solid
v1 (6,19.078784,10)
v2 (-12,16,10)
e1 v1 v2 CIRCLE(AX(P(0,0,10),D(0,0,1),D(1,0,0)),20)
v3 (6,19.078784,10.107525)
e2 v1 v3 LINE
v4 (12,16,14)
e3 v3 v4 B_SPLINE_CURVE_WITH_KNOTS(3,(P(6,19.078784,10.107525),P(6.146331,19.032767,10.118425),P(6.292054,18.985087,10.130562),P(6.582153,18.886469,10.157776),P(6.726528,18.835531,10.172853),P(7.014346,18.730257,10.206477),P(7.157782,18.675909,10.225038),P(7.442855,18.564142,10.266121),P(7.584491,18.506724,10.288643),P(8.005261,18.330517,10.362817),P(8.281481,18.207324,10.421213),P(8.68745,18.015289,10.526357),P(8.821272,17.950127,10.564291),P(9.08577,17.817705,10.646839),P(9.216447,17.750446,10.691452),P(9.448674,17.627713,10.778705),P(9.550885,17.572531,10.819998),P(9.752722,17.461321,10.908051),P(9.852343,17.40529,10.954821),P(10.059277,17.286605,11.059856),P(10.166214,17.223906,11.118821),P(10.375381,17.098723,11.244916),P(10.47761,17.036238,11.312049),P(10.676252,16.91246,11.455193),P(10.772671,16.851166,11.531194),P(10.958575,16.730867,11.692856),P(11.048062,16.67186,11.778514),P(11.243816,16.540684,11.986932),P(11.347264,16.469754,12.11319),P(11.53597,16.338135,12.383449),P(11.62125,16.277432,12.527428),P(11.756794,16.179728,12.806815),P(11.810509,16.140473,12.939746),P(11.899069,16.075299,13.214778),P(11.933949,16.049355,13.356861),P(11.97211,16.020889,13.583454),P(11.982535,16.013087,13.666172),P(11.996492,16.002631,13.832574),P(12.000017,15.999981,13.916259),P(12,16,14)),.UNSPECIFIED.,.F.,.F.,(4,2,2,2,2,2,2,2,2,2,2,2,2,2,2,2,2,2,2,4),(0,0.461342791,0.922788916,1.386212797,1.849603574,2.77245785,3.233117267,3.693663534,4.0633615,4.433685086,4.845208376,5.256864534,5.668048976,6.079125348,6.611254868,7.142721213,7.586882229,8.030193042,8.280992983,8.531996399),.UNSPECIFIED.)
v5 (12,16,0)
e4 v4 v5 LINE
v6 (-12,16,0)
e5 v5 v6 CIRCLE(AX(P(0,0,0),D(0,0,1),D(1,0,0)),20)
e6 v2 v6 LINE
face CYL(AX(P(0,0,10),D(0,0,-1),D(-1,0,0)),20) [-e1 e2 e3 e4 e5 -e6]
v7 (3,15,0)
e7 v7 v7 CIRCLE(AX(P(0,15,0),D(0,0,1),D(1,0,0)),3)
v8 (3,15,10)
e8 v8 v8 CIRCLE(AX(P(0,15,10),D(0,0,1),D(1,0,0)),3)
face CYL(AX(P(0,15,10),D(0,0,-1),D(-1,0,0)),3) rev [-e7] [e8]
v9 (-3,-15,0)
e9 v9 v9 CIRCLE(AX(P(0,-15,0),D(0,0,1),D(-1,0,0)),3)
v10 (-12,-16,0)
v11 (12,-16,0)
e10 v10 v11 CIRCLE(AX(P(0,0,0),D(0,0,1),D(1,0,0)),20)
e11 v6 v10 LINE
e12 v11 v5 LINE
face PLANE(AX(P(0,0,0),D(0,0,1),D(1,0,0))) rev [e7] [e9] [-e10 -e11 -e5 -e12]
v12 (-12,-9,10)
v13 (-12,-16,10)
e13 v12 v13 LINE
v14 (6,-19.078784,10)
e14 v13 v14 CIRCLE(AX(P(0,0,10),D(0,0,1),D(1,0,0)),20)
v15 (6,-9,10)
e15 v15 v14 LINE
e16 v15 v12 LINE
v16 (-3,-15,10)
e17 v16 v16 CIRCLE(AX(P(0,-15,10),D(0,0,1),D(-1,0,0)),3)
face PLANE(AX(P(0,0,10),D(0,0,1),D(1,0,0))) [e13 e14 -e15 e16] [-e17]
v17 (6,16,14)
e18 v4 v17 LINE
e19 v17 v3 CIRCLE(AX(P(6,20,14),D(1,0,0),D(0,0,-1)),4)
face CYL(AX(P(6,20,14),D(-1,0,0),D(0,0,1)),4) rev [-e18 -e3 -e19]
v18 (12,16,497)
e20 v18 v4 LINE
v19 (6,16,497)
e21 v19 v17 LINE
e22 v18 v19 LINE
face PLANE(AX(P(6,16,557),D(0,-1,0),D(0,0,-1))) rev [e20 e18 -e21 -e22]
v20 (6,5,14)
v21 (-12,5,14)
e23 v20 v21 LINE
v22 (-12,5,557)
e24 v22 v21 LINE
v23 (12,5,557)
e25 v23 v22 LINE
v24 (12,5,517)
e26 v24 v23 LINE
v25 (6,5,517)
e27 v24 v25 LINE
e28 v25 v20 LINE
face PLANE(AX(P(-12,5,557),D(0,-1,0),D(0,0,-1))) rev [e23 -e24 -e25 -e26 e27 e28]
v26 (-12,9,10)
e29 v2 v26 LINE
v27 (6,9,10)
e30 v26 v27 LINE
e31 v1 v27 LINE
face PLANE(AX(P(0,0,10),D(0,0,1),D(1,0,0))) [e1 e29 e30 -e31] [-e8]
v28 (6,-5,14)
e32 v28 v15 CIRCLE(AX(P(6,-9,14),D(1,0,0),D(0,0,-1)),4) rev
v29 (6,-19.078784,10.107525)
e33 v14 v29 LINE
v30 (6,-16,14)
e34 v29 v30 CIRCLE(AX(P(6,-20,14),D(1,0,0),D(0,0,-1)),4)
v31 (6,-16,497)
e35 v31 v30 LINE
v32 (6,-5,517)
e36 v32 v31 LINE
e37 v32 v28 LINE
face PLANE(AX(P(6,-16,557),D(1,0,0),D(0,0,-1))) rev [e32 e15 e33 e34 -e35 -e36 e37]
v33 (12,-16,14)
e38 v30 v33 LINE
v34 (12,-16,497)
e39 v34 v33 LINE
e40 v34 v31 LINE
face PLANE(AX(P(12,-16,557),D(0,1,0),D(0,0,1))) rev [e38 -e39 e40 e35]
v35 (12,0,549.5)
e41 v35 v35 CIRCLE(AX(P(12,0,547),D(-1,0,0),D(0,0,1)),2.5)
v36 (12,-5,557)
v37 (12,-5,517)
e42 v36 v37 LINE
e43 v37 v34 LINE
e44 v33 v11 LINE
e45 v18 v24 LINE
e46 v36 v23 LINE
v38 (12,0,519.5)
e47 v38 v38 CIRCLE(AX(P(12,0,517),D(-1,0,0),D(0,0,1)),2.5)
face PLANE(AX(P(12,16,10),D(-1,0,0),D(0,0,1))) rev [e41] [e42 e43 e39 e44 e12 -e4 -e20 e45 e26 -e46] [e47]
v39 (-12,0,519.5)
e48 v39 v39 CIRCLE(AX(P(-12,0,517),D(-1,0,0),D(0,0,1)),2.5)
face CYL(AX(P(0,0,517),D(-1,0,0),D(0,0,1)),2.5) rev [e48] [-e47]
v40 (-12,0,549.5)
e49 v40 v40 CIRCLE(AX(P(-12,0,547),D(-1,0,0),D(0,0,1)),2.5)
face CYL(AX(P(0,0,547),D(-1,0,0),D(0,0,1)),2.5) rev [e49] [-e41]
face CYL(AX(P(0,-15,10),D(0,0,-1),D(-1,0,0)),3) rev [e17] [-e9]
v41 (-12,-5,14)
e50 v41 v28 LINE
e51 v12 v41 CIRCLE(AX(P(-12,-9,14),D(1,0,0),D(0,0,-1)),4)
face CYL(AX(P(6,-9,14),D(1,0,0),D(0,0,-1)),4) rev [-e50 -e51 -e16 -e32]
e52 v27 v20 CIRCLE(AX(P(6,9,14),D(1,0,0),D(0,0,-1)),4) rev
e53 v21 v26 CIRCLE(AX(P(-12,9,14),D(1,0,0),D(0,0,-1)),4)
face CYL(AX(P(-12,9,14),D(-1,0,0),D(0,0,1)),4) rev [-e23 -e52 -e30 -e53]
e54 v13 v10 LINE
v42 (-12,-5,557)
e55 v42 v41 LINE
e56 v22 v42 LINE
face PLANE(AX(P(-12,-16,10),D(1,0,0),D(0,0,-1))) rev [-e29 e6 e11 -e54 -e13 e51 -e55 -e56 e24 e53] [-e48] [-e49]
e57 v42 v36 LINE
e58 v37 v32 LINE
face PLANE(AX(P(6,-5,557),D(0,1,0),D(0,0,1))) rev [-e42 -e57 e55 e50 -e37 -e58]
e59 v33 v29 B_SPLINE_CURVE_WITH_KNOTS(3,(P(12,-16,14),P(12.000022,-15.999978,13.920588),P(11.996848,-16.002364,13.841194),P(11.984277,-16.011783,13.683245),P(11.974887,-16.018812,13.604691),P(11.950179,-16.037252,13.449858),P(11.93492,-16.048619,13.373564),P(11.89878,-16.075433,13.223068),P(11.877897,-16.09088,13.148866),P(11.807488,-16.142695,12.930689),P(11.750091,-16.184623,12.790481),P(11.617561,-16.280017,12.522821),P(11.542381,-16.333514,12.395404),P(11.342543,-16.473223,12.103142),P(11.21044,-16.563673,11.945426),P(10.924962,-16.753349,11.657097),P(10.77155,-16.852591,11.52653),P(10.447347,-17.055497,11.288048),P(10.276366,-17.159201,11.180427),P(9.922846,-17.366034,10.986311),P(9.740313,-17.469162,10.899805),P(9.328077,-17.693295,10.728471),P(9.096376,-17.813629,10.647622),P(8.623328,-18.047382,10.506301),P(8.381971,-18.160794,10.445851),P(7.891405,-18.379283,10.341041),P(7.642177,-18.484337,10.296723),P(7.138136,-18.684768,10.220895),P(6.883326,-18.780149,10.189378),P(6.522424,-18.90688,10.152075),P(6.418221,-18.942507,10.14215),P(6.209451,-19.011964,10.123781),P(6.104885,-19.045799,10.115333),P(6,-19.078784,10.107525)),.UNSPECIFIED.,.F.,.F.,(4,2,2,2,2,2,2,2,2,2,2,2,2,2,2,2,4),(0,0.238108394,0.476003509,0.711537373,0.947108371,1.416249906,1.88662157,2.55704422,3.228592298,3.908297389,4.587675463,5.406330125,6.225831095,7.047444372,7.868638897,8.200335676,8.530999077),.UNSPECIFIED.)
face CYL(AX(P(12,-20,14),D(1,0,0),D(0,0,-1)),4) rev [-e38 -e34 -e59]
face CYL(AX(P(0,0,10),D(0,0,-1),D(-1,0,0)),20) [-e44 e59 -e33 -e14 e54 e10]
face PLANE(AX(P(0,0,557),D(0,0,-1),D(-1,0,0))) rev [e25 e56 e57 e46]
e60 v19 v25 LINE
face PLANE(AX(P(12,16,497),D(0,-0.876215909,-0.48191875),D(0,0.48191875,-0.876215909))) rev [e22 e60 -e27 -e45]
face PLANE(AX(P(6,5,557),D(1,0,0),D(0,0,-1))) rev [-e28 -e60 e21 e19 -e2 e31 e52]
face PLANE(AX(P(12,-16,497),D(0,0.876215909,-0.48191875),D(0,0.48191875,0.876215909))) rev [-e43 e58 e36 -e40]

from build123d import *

# Parameters (mm, degrees)
ESQUISSE1_R             = 3
BOSS_EXTRU_1_DEPTH      = 10
BOSS_EXTRU_2_DEPTH      = 547
ENL_V_MAT_EXTRU_1_DEPTH = 558.649531516
CONG_1_R                = 4
ESQUISSE4_R             = 2.5
ENL_V_MAT_EXTRU_2_DEPTH = 12
ENL_V_START             = -12
ESQUISSE4_2_R           = 2.5
ENL_V_MAT_EXTRU_3_DEPTH = 12


with BuildPart() as part:
    # Esquisse1 → Boss.-Extru.1 (new body)
    with BuildSketch(Plane.XY):
        with BuildLine():
            Line((12, 16), (12, -16))
            ThreePointArc((12, -16), (0, -20), (-12, -16))
            Line((-12, -16), (-12, 16))
            ThreePointArc((-12, 16), (0, 20), (12, 16))
        make_face()
        with Locations((0, 15)):
            Circle(ESQUISSE1_R, mode=Mode.SUBTRACT)
        with Locations(Location((0, -15, 0), (0, 0, 180))):
            Circle(ESQUISSE1_R, mode=Mode.SUBTRACT)
    extrude(amount=BOSS_EXTRU_1_DEPTH)

    # Esquisse2 → Boss.-Extru.2 (add)
    with BuildSketch(Plane.XY.offset(10)):
        Polygon((12, 16), (12, -16), (6, -16), (6, -5), (-12, -5), (-12, 5), (6, 5), (6, 16), align=None)
    extrude(amount=BOSS_EXTRU_2_DEPTH)

    # Esquisse3 → Enlèv. mat.-Extru.1 (cut, through all)
    with BuildSketch(Plane.ZY.offset(-6)):
        Polygon((557, 5), (557, 16), (497, 16), (517, 5), align=None)
        Polygon((557, -5), (557, -16), (497, -16), (517, -5), align=None)
    extrude(amount=-ENL_V_MAT_EXTRU_1_DEPTH, mode=Mode.SUBTRACT)

    # Congé1
    # the kernel refuses this fillet: 4 mm, written as the material it adds along each edge
    with BuildSketch(Plane(origin=(6, 16, 10), x_dir=(0, 0, 1), z_dir=(1, 0, 0))) as cong_1_piece_1_section:
        with BuildLine():
            CenterArc((CONG_1_R, -CONG_1_R), CONG_1_R, 90, 90)
            Line((0, -CONG_1_R), (0, 0))
            Line((0, 0), (CONG_1_R, 0))
        make_face()
    cong_1_piece_1 = extrude(amount=16, mode=Mode.PRIVATE)
    cong_1_piece_1 = cong_1_piece_1 & Plane(origin=(0, 0, 11.015044396), x_dir=(-0.6000000000000009, 0.7999999999999994, 0), z_dir=(0, 0, -1)) * Cylinder(20, 48, mode=Mode.PRIVATE)
    add(cong_1_piece_1)
    with BuildSketch(Plane(origin=(-12, 5, 10), x_dir=(0, 1, 0), z_dir=(1, 0, 0))) as cong_1_piece_2:
        with BuildLine():
            CenterArc((CONG_1_R, CONG_1_R), CONG_1_R, 180, 90)
            Line((0, CONG_1_R), (0, 0))
            Line((0, 0), (CONG_1_R, 0))
        make_face()
    extrude(amount=18)
    with BuildSketch(Plane(origin=(6, -5, 10), x_dir=(0, 0, 1), z_dir=(-1, 0, 0))) as cong_1_piece_3:
        with BuildLine():
            CenterArc((CONG_1_R, -CONG_1_R), CONG_1_R, 90, 90)
            Line((0, -CONG_1_R), (0, 0))
            Line((0, 0), (CONG_1_R, 0))
        make_face()
    extrude(amount=18)
    with BuildSketch(Plane(origin=(22, -16, 10), x_dir=(0, 0, 1), z_dir=(-1, 0, 0))) as cong_1_piece_4_section:
        with BuildLine():
            CenterArc((CONG_1_R, -CONG_1_R), CONG_1_R, 90, 90)
            Line((0, -CONG_1_R), (0, 0))
            Line((0, 0), (CONG_1_R, 0))
        make_face()
    cong_1_piece_4 = extrude(amount=16, mode=Mode.PRIVATE)
    cong_1_piece_4 = cong_1_piece_4 & Plane(origin=(0, 0, 11.015045295), x_dir=(0.5999999999999954, -0.8000000000000034, 0), z_dir=(0, 0, -1)) * Cylinder(20, 48, mode=Mode.PRIVATE)
    add(cong_1_piece_4)

    # Esquisse4 → Enlèv. mat.-Extru.2 (cut)
    with BuildSketch(Plane.ZY.offset(12)):
        with Locations((547, 0)):
            Circle(ESQUISSE4_R)
        with Locations((517, 0)):
            Circle(ESQUISSE4_R)
    extrude(amount=-ENL_V_MAT_EXTRU_2_DEPTH, mode=Mode.SUBTRACT)

    # Esquisse4<2> → Enlèv. mat.-Extru.3 (cut)
    with BuildSketch(Plane.ZY.offset(12).offset(ENL_V_START)):
        with Locations((547, 0)):
            Circle(ESQUISSE4_2_R)
        with Locations((517, 0)):
            Circle(ESQUISSE4_2_R)
    extrude(amount=-ENL_V_MAT_EXTRU_3_DEPTH, mode=Mode.SUBTRACT)


solid = part.part
